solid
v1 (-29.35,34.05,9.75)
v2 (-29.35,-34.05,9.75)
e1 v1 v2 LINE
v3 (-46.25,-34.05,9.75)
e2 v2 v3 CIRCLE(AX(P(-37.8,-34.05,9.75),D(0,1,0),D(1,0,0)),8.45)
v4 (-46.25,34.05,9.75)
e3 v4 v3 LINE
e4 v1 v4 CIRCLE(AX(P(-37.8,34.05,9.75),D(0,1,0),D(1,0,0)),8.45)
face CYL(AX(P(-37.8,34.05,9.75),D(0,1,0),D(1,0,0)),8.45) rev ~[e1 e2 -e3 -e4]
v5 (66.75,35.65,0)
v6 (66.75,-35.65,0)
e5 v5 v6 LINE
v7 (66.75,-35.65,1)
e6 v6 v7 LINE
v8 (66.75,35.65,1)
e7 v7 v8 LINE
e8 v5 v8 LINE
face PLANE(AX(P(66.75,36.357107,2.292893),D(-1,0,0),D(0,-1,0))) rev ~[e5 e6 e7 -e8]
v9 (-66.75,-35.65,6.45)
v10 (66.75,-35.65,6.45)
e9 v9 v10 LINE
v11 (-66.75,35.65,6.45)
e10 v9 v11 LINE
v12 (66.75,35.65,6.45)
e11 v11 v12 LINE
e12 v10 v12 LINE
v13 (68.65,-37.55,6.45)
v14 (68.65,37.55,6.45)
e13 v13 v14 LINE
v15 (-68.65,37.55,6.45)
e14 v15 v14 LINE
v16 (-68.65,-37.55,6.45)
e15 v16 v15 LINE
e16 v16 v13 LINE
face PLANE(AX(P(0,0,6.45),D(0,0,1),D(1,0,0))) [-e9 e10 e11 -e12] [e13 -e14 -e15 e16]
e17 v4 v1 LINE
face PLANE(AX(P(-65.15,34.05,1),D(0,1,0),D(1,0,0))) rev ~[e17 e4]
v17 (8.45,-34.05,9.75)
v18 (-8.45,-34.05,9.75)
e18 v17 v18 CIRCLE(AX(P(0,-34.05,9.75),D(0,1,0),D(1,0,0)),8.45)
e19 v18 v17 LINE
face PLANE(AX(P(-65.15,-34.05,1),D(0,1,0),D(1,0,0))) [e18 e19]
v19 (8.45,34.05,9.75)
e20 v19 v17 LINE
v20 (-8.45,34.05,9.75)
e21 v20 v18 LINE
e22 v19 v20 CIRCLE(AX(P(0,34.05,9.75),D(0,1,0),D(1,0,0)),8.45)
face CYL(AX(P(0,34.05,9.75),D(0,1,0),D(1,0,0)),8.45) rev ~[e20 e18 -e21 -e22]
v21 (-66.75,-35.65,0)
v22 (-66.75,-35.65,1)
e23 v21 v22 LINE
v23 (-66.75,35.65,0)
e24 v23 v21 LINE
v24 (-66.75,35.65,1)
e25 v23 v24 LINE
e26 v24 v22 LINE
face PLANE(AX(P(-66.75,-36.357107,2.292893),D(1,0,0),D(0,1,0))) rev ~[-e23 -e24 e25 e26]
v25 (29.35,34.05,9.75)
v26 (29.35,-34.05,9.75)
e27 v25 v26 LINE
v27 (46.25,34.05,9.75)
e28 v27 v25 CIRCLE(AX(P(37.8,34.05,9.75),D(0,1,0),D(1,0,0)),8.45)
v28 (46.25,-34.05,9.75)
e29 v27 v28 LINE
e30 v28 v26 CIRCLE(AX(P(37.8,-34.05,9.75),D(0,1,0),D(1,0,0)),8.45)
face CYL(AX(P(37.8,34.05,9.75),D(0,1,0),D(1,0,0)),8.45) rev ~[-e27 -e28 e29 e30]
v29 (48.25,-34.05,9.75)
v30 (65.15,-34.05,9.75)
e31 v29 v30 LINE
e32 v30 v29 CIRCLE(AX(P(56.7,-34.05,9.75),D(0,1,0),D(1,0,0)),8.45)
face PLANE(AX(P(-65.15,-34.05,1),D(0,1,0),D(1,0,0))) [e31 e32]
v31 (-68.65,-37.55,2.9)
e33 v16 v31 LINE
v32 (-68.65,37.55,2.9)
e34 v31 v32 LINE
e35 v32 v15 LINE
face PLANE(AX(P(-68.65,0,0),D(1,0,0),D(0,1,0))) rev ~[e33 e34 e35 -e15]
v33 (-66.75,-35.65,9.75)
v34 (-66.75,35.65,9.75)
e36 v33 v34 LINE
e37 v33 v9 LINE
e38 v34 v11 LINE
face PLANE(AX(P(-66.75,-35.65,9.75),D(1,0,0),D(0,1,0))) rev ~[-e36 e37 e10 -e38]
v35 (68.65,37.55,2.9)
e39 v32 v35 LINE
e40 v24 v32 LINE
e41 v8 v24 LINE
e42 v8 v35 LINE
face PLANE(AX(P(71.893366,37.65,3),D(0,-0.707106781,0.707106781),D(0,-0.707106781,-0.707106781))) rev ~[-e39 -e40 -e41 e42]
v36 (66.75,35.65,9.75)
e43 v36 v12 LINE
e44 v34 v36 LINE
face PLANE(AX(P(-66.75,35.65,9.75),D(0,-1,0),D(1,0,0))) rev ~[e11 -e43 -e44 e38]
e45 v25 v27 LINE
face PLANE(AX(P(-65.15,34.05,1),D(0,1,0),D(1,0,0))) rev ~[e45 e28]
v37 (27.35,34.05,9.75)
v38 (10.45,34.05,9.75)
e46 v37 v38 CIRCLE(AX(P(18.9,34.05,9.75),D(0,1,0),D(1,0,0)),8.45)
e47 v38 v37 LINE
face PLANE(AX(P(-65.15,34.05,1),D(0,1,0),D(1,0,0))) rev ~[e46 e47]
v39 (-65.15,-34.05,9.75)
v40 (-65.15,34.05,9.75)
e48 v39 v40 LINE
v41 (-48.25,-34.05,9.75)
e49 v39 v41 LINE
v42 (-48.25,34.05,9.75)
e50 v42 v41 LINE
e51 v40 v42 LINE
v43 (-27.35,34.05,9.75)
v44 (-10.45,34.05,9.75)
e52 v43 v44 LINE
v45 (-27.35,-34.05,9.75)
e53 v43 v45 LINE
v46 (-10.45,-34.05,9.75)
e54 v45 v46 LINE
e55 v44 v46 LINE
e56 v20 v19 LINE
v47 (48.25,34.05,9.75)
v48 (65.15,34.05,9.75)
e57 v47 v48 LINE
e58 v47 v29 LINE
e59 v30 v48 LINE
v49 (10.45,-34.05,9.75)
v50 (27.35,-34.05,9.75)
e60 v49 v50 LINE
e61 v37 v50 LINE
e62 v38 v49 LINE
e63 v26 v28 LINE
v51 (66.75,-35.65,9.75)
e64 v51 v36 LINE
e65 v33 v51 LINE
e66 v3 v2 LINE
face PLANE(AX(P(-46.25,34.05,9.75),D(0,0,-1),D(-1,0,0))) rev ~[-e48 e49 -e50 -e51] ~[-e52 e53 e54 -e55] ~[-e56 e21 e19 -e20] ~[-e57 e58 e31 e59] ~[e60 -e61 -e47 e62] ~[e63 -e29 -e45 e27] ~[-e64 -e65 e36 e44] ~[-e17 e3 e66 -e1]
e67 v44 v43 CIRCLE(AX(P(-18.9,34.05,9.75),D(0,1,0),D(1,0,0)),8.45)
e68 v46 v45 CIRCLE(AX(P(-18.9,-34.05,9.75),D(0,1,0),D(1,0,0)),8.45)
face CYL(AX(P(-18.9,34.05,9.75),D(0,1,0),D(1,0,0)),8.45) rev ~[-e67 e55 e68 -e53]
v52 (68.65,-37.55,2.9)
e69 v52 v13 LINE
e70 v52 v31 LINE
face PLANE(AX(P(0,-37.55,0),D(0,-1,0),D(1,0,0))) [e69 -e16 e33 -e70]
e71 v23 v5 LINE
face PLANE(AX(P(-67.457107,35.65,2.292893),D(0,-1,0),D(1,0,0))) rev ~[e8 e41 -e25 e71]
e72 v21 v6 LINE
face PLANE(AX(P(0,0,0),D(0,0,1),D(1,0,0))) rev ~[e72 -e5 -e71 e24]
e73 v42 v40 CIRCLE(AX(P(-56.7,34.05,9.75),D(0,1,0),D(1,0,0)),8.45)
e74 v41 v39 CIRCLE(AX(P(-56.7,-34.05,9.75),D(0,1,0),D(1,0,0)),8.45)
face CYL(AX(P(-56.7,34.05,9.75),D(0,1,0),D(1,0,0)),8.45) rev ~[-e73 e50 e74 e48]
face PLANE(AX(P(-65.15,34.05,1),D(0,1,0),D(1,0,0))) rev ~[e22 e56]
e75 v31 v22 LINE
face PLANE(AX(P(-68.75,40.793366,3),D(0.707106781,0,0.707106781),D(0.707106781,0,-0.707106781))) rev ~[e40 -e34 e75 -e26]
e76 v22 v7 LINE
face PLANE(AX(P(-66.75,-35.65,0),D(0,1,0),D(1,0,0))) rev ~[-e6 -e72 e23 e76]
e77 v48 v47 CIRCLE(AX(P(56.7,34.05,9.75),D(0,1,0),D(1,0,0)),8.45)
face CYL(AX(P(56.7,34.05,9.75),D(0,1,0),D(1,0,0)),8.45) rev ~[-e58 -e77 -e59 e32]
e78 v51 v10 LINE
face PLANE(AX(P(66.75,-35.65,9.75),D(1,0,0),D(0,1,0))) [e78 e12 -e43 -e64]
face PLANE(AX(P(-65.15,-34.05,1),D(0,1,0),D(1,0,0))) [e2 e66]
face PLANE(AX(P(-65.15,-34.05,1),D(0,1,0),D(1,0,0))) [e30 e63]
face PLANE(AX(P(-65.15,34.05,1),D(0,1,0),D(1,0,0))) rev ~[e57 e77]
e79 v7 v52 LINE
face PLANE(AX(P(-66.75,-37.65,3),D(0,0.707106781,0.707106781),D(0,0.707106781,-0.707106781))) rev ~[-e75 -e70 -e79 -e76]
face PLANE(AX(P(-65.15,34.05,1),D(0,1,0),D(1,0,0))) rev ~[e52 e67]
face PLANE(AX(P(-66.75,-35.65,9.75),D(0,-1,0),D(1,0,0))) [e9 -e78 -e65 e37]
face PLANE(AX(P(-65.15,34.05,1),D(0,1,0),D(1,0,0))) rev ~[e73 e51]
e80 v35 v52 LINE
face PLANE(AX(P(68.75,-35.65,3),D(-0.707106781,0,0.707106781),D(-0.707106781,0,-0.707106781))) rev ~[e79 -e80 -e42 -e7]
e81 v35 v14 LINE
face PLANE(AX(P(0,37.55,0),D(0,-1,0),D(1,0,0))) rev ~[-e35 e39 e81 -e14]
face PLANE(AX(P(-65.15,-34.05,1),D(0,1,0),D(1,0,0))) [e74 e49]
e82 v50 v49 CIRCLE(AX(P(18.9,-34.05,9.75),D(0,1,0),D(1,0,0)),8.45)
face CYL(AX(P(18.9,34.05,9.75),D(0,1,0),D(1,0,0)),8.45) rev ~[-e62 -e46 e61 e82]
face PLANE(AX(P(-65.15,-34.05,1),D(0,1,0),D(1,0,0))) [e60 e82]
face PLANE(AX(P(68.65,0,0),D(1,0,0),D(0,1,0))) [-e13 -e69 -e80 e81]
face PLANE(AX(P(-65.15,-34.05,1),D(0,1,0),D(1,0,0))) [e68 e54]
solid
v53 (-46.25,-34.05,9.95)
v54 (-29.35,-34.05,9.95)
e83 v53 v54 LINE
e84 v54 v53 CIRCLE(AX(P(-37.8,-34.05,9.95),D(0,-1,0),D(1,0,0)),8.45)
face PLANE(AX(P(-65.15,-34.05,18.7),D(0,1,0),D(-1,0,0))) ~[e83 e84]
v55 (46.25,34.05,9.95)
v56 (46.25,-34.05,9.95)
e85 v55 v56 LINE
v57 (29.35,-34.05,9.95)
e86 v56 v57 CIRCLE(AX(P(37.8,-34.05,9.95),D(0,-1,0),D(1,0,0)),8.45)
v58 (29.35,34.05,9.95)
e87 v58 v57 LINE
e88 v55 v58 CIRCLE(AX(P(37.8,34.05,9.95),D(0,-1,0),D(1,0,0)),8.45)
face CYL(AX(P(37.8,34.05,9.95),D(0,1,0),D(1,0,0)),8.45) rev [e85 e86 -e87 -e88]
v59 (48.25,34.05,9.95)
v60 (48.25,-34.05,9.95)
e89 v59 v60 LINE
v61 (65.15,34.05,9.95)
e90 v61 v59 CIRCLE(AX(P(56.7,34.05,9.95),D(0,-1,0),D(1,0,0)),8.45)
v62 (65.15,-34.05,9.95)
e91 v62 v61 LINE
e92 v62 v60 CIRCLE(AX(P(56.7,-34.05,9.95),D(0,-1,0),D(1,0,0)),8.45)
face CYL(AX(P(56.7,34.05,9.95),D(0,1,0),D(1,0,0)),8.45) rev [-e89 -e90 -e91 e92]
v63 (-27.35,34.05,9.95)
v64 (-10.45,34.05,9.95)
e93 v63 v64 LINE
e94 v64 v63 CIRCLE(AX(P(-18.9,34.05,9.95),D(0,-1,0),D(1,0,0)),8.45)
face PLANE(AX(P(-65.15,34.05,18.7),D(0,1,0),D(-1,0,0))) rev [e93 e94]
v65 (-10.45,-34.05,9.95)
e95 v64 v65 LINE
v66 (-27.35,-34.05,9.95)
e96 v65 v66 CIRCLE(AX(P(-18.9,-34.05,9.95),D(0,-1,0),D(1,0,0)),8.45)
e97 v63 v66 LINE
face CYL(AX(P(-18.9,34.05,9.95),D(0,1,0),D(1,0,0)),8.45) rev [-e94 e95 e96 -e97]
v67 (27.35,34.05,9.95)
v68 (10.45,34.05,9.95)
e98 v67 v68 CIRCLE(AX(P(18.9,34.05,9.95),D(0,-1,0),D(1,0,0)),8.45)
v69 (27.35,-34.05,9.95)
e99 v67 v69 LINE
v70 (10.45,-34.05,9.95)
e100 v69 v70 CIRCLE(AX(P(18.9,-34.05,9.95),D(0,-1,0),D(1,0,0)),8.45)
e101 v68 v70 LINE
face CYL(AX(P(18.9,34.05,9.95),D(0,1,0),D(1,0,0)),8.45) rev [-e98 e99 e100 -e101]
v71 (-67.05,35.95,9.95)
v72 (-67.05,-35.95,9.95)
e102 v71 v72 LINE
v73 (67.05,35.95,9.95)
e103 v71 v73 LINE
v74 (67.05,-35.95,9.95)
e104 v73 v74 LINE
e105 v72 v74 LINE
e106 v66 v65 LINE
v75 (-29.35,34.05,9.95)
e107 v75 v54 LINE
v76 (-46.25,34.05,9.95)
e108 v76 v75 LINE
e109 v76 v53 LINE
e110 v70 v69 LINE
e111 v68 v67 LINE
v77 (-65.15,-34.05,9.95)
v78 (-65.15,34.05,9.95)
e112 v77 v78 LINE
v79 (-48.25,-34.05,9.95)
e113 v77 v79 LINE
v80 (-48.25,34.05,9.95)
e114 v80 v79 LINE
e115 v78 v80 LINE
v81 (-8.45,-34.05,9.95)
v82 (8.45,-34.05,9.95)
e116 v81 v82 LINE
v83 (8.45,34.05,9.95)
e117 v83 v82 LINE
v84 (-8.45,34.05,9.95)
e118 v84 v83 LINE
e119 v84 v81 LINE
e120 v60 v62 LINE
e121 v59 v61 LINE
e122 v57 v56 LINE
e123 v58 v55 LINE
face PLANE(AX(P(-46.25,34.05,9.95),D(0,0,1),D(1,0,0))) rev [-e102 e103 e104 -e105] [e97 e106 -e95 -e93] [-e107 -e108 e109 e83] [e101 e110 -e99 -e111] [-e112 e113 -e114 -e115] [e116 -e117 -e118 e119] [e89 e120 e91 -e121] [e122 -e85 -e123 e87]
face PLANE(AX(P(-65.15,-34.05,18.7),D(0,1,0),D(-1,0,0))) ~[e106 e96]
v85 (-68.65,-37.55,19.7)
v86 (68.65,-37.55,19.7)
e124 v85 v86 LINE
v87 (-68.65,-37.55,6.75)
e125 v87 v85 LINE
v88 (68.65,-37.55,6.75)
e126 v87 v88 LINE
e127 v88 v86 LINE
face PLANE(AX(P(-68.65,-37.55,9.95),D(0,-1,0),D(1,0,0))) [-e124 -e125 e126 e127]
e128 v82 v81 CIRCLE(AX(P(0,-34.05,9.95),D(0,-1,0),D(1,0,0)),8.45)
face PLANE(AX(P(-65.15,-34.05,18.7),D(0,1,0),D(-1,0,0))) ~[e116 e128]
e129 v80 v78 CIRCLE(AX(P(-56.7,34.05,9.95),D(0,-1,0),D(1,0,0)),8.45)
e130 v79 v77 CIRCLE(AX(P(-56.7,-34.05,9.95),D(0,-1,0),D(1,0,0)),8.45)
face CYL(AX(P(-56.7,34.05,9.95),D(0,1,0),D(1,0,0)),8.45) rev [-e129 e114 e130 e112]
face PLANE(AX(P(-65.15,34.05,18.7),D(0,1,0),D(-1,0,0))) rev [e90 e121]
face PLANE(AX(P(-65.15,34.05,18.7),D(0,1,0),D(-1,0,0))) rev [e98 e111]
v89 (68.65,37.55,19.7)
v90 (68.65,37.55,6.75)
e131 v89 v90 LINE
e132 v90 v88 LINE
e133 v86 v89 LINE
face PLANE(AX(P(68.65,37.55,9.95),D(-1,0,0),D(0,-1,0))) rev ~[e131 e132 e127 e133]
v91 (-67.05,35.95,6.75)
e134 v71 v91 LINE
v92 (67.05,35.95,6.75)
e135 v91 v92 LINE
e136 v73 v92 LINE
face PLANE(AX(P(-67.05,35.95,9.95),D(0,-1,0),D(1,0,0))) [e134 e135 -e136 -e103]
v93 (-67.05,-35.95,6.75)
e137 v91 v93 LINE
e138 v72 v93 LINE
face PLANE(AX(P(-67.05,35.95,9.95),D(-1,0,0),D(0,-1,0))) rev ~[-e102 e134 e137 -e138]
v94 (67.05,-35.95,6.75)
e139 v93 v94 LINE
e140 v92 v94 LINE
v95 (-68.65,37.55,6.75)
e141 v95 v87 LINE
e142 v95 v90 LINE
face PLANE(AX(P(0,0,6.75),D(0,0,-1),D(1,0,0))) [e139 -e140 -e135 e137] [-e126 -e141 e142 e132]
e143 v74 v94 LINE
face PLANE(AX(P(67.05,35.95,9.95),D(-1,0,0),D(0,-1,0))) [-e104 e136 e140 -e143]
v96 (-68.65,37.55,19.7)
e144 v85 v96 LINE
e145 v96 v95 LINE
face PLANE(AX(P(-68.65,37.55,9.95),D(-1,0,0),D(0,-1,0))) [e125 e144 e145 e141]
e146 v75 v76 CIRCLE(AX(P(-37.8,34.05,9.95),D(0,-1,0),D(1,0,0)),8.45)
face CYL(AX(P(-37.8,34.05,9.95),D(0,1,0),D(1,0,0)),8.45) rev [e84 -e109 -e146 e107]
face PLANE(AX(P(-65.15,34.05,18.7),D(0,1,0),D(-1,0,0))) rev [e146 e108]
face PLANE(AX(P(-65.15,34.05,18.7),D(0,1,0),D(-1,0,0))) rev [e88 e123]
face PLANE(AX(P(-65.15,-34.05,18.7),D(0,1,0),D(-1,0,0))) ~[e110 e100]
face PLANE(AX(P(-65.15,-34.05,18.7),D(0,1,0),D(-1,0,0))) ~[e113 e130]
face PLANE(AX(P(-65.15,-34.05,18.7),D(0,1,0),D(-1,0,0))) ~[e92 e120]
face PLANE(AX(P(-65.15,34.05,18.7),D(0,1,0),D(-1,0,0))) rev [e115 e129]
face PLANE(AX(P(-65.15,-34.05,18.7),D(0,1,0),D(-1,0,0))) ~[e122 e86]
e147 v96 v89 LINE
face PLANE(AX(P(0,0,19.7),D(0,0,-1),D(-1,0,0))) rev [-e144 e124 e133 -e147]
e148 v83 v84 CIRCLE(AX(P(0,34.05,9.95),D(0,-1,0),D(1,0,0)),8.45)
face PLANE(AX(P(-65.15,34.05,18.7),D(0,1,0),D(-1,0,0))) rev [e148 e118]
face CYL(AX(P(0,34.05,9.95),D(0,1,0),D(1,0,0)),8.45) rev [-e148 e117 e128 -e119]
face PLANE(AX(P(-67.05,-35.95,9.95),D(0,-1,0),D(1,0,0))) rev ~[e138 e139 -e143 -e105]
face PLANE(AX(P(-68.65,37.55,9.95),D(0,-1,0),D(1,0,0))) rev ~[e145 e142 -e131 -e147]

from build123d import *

# Parameters (mm, degrees)
F4_W          = 137.3
F4_H          = 75.1
F5_DEPTH      = 1
F6_W          = 137.3
F6_H          = 75.1
F6_W_2        = 130.3
F6_H_2        = 68.1
F7_DEPTH      = 8.75
F9_DEPTH      = 68.1
F12_W         = 137.3
F12_H         = 75.1
F12_W_2       = 133.5
F12_H_2       = 71.3
F13_DEPTH     = 3.3
F14_W         = 137.3
F14_H         = 75.1
F14_W_2       = 133.5
F14_H_2       = 71.3
F15_DEPTH     = 3
F16_T4_DEPTH  = 133.5
F16_T9_DEPTH  = 71.3
F16_T14_DEPTH = 133.5
F16_T19_DEPTH = 71.3
F16_T25_DEPTH = 138.6433659759
F16_T31_DEPTH = 76.4433659759
F16_T40_DEPTH = 138.6433659759
F16_T46_DEPTH = 76.4433659759
F16_T55_DEPTH = 138.6433659759
F16_T61_DEPTH = 76.4433659759
F16_T70_DEPTH = 76.4433659759
F16_T76_DEPTH = 138.6433659759
F17_W         = 137.3
F17_H         = 75.1
F17_W_2       = 134.1
F17_H_2       = 71.9
F18_DEPTH     = 3.2


# Not quite as in the source:
# - a fillet or chamfer that OpenCascade refuses, or shapes differently, is made with other operations: its cross-section is extruded or revolved along the edge and cut away or added


with BuildPart() as f5:
    # F4 (on Top) → F5 (new body)
    with BuildSketch(Plane.XY):
        Rectangle(F4_W, F4_H)
    extrude(amount=F5_DEPTH)

    # F6 (on face) → F7 (join)
    with BuildSketch(Plane.XY.offset(1)):
        Rectangle(F6_W, F6_H)
        Rectangle(F6_W_2, F6_H_2, mode=Mode.SUBTRACT)
    extrude(amount=F7_DEPTH)

    # F8 (on face) → F9 (join, through all)
    with BuildSketch(Plane.XZ.offset(-34.05)):
        with BuildLine():
            ThreePointArc((-48.25, 9.75), (-56.7, 1.3), (-65.15, 9.75))
            Line((-65.15, 9.75), (-65.15, 1))
            Line((-65.15, 1), (65.15, 1))
            Line((65.15, 1), (65.15, 9.75))
            ThreePointArc((65.15, 9.75), (56.7, 1.3), (48.25, 9.75))
            Line((48.25, 9.75), (46.25, 9.75))
            ThreePointArc((46.25, 9.75), (37.8, 1.3), (29.35, 9.75))
            Line((29.35, 9.75), (27.35, 9.75))
            ThreePointArc((27.35, 9.75), (18.9, 1.3), (10.45, 9.75))
            Line((10.45, 9.75), (8.45, 9.75))
            ThreePointArc((8.45, 9.75), (0, 1.3), (-8.45, 9.75))
            Line((-8.45, 9.75), (-10.45, 9.75))
            ThreePointArc((-10.45, 9.75), (-18.9, 1.3), (-27.35, 9.75))
            Line((-27.35, 9.75), (-29.35, 9.75))
            ThreePointArc((-29.35, 9.75), (-37.8, 1.3), (-46.25, 9.75))
            Line((-46.25, 9.75), (-48.25, 9.75))
        make_face()
    extrude(amount=F9_DEPTH)


with BuildPart() as f11_1:
    # F11: instance of F5
    add(f5.part.mirror(Plane.XY.offset(9.85)))

    # F17 (on face) → F18 (join)
    with BuildSketch(Plane(origin=(0, 0, 9.95), x_dir=(1, 0, 0), z_dir=(0, 0, -1))):
        Rectangle(F17_W, F17_H)
        Rectangle(F17_W_2, F17_H_2, mode=Mode.SUBTRACT)
    extrude(amount=F18_DEPTH)


with BuildPart() as f5_1:
    add(f5.part)

    # F12 (on face) → F13 (cut)
    with BuildSketch(Plane.XY.offset(9.75)):
        Rectangle(F12_W, F12_H)
        Rectangle(F12_W_2, F12_H_2, mode=Mode.SUBTRACT)
    extrude(amount=-F13_DEPTH, mode=Mode.SUBTRACT)

    # F14 (on face) → F15 (cut)
    with BuildSketch(Plane(origin=(0, 0, 0), x_dir=(1, 0, 0), z_dir=(0, 0, -1))):
        Rectangle(F14_W, F14_H)
        Rectangle(F14_W_2, F14_H_2, mode=Mode.SUBTRACT)
    extrude(amount=-F15_DEPTH, mode=Mode.SUBTRACT)

    # F16: chamfer of 2 on 4 edges, made by hand


with BuildPart() as f16_tool2:
    # F16_s3 → F16_t4 (new body)
    with BuildSketch(Plane.YZ.offset(-66.75)):
        Polygon((-37.65, 3), (-35.65, 1), (-35.65, 3), align=None)
    extrude(amount=F16_T4_DEPTH)

    split(bisect_by=Plane.XZ.offset(37.55), keep=Keep.BOTTOM)


with BuildPart() as f5_2:
    add(f5_1.part)

    # F16_t1: union F16_tool2
    add(f16_tool2.part)


with BuildPart() as f16_tool7:
    # F16_s8 → F16_t9 (new body)
    with BuildSketch(Plane.XZ.offset(-35.65)):
        Polygon((-68.75, 3), (-66.75, 1), (-66.75, 3), align=None)
    extrude(amount=F16_T9_DEPTH)

    split(bisect_by=Plane.YZ.offset(-68.65), keep=Keep.TOP)


with BuildPart() as f5_3:
    add(f5_2.part)

    # F16_t6: union F16_tool7
    add(f16_tool7.part)


with BuildPart() as f16_tool12:
    # F16_s13 → F16_t14 (new body)
    with BuildSketch(Plane.YZ.offset(66.75)):
        Polygon((37.65, 3), (35.65, 1), (35.65, 3), align=None)
    extrude(amount=-F16_T14_DEPTH)

    split(bisect_by=Plane.XZ.offset(-37.55), keep=Keep.TOP)


with BuildPart() as f5_4:
    add(f5_3.part)

    # F16_t11: union F16_tool12
    add(f16_tool12.part)


with BuildPart() as f16_tool17:
    # F16_s18 → F16_t19 (new body)
    with BuildSketch(Plane.XZ.offset(35.65)):
        Polygon((68.75, 3), (66.75, 1), (66.75, 3), align=None)
    extrude(amount=-F16_T19_DEPTH)

    split(bisect_by=Plane.YZ.offset(68.65), keep=Keep.BOTTOM)


with BuildPart() as f5_5:
    add(f5_4.part)

    # F16_t16: union F16_tool17
    add(f16_tool17.part)


with BuildPart() as f16_tool23:
    # F16_s24 → F16_t25 (new body)
    with BuildSketch(Plane.YZ.offset(-71.8933659759)):
        Polygon((-37.65, 3), (-35.65, 1), (-35.65, 3), align=None)
    extrude(amount=F16_T25_DEPTH)

    split(bisect_by=Plane.XZ.offset(37.55), keep=Keep.BOTTOM)

    split(bisect_by=Plane.YZ.offset(-68.65), keep=Keep.TOP)

    split(bisect_by=Plane.YZ.offset(-66.75), keep=Keep.BOTTOM)


with BuildPart() as f16_tool29:
    # F16_s30 → F16_t31 (new body)
    with BuildSketch(Plane.XZ.offset(-35.65)):
        Polygon((-68.75, 3), (-66.75, 1), (-66.75, 3), align=None)
    extrude(amount=F16_T31_DEPTH)

    split(bisect_by=Plane.XZ.offset(37.55), keep=Keep.BOTTOM)

    split(bisect_by=Plane.YZ.offset(-68.65), keep=Keep.TOP)

    split(bisect_by=Plane.XZ.offset(35.65), keep=Keep.TOP)


with BuildPart() as f16_tool23_1:
    add(f16_tool23.part)

    # F16_t35: intersect F16_tool29
    add(f16_tool29.part, mode=Mode.INTERSECT)


with BuildPart() as f5_6:
    add(f5_5.part)

    # F16_t21: union F16_tool23
    add(f16_tool23_1.part)


with BuildPart() as f16_tool38:
    # F16_s39 → F16_t40 (new body)
    with BuildSketch(Plane.YZ.offset(-66.75)):
        Polygon((-37.65, 3), (-35.65, 1), (-35.65, 3), align=None)
    extrude(amount=F16_T40_DEPTH)

    split(bisect_by=Plane.XZ.offset(37.55), keep=Keep.BOTTOM)

    split(bisect_by=Plane.YZ.offset(68.65), keep=Keep.BOTTOM)

    split(bisect_by=Plane.YZ.offset(66.75), keep=Keep.TOP)


with BuildPart() as f16_tool44:
    # F16_s45 → F16_t46 (new body)
    with BuildSketch(Plane.XZ.offset(40.7933659759)):
        Polygon((68.75, 3), (66.75, 1), (66.75, 3), align=None)
    extrude(amount=-F16_T46_DEPTH)

    split(bisect_by=Plane.XZ.offset(37.55), keep=Keep.BOTTOM)

    split(bisect_by=Plane.YZ.offset(68.65), keep=Keep.BOTTOM)

    split(bisect_by=Plane.XZ.offset(35.65), keep=Keep.TOP)


with BuildPart() as f16_tool38_1:
    add(f16_tool38.part)

    # F16_t50: intersect F16_tool44
    add(f16_tool44.part, mode=Mode.INTERSECT)


with BuildPart() as f5_7:
    add(f5_6.part)

    # F16_t36: union F16_tool38
    add(f16_tool38_1.part)


with BuildPart() as f16_tool53:
    # F16_s54 → F16_t55 (new body)
    with BuildSketch(Plane.YZ.offset(66.75)):
        Polygon((37.65, 3), (35.65, 1), (35.65, 3), align=None)
    extrude(amount=-F16_T55_DEPTH)

    split(bisect_by=Plane.YZ.offset(-68.65), keep=Keep.TOP)

    split(bisect_by=Plane.XZ.offset(-37.55), keep=Keep.TOP)

    split(bisect_by=Plane.YZ.offset(-66.75), keep=Keep.BOTTOM)


with BuildPart() as f16_tool59:
    # F16_s60 → F16_t61 (new body)
    with BuildSketch(Plane.XZ.offset(-40.7933659759)):
        Polygon((-68.75, 3), (-66.75, 1), (-66.75, 3), align=None)
    extrude(amount=F16_T61_DEPTH)

    split(bisect_by=Plane.YZ.offset(-68.65), keep=Keep.TOP)

    split(bisect_by=Plane.XZ.offset(-37.55), keep=Keep.TOP)

    split(bisect_by=Plane.XZ.offset(-35.65), keep=Keep.BOTTOM)


with BuildPart() as f16_tool53_1:
    add(f16_tool53.part)

    # F16_t65: intersect F16_tool59
    add(f16_tool59.part, mode=Mode.INTERSECT)


with BuildPart() as f5_8:
    add(f5_7.part)

    # F16_t51: union F16_tool53
    add(f16_tool53_1.part)


with BuildPart() as f16_tool68:
    # F16_s69 → F16_t70 (new body)
    with BuildSketch(Plane.XZ.offset(35.65)):
        Polygon((68.75, 3), (66.75, 1), (66.75, 3), align=None)
    extrude(amount=-F16_T70_DEPTH)

    split(bisect_by=Plane.YZ.offset(68.65), keep=Keep.BOTTOM)

    split(bisect_by=Plane.XZ.offset(-37.55), keep=Keep.TOP)

    split(bisect_by=Plane.XZ.offset(-35.65), keep=Keep.BOTTOM)


with BuildPart() as f16_tool74:
    # F16_s75 → F16_t76 (new body)
    with BuildSketch(Plane.YZ.offset(71.8933659759)):
        Polygon((37.65, 3), (35.65, 1), (35.65, 3), align=None)
    extrude(amount=-F16_T76_DEPTH)

    split(bisect_by=Plane.YZ.offset(68.65), keep=Keep.BOTTOM)

    split(bisect_by=Plane.XZ.offset(-37.55), keep=Keep.TOP)

    split(bisect_by=Plane.YZ.offset(66.75), keep=Keep.TOP)


with BuildPart() as f16_tool68_1:
    add(f16_tool68.part)

    # F16_t80: intersect F16_tool74
    add(f16_tool74.part, mode=Mode.INTERSECT)


with BuildPart() as f5_9:
    add(f5_8.part)

    # F16_t66: union F16_tool68
    add(f16_tool68_1.part)


solid = Compound([f11_1.part, f5_9.part])
